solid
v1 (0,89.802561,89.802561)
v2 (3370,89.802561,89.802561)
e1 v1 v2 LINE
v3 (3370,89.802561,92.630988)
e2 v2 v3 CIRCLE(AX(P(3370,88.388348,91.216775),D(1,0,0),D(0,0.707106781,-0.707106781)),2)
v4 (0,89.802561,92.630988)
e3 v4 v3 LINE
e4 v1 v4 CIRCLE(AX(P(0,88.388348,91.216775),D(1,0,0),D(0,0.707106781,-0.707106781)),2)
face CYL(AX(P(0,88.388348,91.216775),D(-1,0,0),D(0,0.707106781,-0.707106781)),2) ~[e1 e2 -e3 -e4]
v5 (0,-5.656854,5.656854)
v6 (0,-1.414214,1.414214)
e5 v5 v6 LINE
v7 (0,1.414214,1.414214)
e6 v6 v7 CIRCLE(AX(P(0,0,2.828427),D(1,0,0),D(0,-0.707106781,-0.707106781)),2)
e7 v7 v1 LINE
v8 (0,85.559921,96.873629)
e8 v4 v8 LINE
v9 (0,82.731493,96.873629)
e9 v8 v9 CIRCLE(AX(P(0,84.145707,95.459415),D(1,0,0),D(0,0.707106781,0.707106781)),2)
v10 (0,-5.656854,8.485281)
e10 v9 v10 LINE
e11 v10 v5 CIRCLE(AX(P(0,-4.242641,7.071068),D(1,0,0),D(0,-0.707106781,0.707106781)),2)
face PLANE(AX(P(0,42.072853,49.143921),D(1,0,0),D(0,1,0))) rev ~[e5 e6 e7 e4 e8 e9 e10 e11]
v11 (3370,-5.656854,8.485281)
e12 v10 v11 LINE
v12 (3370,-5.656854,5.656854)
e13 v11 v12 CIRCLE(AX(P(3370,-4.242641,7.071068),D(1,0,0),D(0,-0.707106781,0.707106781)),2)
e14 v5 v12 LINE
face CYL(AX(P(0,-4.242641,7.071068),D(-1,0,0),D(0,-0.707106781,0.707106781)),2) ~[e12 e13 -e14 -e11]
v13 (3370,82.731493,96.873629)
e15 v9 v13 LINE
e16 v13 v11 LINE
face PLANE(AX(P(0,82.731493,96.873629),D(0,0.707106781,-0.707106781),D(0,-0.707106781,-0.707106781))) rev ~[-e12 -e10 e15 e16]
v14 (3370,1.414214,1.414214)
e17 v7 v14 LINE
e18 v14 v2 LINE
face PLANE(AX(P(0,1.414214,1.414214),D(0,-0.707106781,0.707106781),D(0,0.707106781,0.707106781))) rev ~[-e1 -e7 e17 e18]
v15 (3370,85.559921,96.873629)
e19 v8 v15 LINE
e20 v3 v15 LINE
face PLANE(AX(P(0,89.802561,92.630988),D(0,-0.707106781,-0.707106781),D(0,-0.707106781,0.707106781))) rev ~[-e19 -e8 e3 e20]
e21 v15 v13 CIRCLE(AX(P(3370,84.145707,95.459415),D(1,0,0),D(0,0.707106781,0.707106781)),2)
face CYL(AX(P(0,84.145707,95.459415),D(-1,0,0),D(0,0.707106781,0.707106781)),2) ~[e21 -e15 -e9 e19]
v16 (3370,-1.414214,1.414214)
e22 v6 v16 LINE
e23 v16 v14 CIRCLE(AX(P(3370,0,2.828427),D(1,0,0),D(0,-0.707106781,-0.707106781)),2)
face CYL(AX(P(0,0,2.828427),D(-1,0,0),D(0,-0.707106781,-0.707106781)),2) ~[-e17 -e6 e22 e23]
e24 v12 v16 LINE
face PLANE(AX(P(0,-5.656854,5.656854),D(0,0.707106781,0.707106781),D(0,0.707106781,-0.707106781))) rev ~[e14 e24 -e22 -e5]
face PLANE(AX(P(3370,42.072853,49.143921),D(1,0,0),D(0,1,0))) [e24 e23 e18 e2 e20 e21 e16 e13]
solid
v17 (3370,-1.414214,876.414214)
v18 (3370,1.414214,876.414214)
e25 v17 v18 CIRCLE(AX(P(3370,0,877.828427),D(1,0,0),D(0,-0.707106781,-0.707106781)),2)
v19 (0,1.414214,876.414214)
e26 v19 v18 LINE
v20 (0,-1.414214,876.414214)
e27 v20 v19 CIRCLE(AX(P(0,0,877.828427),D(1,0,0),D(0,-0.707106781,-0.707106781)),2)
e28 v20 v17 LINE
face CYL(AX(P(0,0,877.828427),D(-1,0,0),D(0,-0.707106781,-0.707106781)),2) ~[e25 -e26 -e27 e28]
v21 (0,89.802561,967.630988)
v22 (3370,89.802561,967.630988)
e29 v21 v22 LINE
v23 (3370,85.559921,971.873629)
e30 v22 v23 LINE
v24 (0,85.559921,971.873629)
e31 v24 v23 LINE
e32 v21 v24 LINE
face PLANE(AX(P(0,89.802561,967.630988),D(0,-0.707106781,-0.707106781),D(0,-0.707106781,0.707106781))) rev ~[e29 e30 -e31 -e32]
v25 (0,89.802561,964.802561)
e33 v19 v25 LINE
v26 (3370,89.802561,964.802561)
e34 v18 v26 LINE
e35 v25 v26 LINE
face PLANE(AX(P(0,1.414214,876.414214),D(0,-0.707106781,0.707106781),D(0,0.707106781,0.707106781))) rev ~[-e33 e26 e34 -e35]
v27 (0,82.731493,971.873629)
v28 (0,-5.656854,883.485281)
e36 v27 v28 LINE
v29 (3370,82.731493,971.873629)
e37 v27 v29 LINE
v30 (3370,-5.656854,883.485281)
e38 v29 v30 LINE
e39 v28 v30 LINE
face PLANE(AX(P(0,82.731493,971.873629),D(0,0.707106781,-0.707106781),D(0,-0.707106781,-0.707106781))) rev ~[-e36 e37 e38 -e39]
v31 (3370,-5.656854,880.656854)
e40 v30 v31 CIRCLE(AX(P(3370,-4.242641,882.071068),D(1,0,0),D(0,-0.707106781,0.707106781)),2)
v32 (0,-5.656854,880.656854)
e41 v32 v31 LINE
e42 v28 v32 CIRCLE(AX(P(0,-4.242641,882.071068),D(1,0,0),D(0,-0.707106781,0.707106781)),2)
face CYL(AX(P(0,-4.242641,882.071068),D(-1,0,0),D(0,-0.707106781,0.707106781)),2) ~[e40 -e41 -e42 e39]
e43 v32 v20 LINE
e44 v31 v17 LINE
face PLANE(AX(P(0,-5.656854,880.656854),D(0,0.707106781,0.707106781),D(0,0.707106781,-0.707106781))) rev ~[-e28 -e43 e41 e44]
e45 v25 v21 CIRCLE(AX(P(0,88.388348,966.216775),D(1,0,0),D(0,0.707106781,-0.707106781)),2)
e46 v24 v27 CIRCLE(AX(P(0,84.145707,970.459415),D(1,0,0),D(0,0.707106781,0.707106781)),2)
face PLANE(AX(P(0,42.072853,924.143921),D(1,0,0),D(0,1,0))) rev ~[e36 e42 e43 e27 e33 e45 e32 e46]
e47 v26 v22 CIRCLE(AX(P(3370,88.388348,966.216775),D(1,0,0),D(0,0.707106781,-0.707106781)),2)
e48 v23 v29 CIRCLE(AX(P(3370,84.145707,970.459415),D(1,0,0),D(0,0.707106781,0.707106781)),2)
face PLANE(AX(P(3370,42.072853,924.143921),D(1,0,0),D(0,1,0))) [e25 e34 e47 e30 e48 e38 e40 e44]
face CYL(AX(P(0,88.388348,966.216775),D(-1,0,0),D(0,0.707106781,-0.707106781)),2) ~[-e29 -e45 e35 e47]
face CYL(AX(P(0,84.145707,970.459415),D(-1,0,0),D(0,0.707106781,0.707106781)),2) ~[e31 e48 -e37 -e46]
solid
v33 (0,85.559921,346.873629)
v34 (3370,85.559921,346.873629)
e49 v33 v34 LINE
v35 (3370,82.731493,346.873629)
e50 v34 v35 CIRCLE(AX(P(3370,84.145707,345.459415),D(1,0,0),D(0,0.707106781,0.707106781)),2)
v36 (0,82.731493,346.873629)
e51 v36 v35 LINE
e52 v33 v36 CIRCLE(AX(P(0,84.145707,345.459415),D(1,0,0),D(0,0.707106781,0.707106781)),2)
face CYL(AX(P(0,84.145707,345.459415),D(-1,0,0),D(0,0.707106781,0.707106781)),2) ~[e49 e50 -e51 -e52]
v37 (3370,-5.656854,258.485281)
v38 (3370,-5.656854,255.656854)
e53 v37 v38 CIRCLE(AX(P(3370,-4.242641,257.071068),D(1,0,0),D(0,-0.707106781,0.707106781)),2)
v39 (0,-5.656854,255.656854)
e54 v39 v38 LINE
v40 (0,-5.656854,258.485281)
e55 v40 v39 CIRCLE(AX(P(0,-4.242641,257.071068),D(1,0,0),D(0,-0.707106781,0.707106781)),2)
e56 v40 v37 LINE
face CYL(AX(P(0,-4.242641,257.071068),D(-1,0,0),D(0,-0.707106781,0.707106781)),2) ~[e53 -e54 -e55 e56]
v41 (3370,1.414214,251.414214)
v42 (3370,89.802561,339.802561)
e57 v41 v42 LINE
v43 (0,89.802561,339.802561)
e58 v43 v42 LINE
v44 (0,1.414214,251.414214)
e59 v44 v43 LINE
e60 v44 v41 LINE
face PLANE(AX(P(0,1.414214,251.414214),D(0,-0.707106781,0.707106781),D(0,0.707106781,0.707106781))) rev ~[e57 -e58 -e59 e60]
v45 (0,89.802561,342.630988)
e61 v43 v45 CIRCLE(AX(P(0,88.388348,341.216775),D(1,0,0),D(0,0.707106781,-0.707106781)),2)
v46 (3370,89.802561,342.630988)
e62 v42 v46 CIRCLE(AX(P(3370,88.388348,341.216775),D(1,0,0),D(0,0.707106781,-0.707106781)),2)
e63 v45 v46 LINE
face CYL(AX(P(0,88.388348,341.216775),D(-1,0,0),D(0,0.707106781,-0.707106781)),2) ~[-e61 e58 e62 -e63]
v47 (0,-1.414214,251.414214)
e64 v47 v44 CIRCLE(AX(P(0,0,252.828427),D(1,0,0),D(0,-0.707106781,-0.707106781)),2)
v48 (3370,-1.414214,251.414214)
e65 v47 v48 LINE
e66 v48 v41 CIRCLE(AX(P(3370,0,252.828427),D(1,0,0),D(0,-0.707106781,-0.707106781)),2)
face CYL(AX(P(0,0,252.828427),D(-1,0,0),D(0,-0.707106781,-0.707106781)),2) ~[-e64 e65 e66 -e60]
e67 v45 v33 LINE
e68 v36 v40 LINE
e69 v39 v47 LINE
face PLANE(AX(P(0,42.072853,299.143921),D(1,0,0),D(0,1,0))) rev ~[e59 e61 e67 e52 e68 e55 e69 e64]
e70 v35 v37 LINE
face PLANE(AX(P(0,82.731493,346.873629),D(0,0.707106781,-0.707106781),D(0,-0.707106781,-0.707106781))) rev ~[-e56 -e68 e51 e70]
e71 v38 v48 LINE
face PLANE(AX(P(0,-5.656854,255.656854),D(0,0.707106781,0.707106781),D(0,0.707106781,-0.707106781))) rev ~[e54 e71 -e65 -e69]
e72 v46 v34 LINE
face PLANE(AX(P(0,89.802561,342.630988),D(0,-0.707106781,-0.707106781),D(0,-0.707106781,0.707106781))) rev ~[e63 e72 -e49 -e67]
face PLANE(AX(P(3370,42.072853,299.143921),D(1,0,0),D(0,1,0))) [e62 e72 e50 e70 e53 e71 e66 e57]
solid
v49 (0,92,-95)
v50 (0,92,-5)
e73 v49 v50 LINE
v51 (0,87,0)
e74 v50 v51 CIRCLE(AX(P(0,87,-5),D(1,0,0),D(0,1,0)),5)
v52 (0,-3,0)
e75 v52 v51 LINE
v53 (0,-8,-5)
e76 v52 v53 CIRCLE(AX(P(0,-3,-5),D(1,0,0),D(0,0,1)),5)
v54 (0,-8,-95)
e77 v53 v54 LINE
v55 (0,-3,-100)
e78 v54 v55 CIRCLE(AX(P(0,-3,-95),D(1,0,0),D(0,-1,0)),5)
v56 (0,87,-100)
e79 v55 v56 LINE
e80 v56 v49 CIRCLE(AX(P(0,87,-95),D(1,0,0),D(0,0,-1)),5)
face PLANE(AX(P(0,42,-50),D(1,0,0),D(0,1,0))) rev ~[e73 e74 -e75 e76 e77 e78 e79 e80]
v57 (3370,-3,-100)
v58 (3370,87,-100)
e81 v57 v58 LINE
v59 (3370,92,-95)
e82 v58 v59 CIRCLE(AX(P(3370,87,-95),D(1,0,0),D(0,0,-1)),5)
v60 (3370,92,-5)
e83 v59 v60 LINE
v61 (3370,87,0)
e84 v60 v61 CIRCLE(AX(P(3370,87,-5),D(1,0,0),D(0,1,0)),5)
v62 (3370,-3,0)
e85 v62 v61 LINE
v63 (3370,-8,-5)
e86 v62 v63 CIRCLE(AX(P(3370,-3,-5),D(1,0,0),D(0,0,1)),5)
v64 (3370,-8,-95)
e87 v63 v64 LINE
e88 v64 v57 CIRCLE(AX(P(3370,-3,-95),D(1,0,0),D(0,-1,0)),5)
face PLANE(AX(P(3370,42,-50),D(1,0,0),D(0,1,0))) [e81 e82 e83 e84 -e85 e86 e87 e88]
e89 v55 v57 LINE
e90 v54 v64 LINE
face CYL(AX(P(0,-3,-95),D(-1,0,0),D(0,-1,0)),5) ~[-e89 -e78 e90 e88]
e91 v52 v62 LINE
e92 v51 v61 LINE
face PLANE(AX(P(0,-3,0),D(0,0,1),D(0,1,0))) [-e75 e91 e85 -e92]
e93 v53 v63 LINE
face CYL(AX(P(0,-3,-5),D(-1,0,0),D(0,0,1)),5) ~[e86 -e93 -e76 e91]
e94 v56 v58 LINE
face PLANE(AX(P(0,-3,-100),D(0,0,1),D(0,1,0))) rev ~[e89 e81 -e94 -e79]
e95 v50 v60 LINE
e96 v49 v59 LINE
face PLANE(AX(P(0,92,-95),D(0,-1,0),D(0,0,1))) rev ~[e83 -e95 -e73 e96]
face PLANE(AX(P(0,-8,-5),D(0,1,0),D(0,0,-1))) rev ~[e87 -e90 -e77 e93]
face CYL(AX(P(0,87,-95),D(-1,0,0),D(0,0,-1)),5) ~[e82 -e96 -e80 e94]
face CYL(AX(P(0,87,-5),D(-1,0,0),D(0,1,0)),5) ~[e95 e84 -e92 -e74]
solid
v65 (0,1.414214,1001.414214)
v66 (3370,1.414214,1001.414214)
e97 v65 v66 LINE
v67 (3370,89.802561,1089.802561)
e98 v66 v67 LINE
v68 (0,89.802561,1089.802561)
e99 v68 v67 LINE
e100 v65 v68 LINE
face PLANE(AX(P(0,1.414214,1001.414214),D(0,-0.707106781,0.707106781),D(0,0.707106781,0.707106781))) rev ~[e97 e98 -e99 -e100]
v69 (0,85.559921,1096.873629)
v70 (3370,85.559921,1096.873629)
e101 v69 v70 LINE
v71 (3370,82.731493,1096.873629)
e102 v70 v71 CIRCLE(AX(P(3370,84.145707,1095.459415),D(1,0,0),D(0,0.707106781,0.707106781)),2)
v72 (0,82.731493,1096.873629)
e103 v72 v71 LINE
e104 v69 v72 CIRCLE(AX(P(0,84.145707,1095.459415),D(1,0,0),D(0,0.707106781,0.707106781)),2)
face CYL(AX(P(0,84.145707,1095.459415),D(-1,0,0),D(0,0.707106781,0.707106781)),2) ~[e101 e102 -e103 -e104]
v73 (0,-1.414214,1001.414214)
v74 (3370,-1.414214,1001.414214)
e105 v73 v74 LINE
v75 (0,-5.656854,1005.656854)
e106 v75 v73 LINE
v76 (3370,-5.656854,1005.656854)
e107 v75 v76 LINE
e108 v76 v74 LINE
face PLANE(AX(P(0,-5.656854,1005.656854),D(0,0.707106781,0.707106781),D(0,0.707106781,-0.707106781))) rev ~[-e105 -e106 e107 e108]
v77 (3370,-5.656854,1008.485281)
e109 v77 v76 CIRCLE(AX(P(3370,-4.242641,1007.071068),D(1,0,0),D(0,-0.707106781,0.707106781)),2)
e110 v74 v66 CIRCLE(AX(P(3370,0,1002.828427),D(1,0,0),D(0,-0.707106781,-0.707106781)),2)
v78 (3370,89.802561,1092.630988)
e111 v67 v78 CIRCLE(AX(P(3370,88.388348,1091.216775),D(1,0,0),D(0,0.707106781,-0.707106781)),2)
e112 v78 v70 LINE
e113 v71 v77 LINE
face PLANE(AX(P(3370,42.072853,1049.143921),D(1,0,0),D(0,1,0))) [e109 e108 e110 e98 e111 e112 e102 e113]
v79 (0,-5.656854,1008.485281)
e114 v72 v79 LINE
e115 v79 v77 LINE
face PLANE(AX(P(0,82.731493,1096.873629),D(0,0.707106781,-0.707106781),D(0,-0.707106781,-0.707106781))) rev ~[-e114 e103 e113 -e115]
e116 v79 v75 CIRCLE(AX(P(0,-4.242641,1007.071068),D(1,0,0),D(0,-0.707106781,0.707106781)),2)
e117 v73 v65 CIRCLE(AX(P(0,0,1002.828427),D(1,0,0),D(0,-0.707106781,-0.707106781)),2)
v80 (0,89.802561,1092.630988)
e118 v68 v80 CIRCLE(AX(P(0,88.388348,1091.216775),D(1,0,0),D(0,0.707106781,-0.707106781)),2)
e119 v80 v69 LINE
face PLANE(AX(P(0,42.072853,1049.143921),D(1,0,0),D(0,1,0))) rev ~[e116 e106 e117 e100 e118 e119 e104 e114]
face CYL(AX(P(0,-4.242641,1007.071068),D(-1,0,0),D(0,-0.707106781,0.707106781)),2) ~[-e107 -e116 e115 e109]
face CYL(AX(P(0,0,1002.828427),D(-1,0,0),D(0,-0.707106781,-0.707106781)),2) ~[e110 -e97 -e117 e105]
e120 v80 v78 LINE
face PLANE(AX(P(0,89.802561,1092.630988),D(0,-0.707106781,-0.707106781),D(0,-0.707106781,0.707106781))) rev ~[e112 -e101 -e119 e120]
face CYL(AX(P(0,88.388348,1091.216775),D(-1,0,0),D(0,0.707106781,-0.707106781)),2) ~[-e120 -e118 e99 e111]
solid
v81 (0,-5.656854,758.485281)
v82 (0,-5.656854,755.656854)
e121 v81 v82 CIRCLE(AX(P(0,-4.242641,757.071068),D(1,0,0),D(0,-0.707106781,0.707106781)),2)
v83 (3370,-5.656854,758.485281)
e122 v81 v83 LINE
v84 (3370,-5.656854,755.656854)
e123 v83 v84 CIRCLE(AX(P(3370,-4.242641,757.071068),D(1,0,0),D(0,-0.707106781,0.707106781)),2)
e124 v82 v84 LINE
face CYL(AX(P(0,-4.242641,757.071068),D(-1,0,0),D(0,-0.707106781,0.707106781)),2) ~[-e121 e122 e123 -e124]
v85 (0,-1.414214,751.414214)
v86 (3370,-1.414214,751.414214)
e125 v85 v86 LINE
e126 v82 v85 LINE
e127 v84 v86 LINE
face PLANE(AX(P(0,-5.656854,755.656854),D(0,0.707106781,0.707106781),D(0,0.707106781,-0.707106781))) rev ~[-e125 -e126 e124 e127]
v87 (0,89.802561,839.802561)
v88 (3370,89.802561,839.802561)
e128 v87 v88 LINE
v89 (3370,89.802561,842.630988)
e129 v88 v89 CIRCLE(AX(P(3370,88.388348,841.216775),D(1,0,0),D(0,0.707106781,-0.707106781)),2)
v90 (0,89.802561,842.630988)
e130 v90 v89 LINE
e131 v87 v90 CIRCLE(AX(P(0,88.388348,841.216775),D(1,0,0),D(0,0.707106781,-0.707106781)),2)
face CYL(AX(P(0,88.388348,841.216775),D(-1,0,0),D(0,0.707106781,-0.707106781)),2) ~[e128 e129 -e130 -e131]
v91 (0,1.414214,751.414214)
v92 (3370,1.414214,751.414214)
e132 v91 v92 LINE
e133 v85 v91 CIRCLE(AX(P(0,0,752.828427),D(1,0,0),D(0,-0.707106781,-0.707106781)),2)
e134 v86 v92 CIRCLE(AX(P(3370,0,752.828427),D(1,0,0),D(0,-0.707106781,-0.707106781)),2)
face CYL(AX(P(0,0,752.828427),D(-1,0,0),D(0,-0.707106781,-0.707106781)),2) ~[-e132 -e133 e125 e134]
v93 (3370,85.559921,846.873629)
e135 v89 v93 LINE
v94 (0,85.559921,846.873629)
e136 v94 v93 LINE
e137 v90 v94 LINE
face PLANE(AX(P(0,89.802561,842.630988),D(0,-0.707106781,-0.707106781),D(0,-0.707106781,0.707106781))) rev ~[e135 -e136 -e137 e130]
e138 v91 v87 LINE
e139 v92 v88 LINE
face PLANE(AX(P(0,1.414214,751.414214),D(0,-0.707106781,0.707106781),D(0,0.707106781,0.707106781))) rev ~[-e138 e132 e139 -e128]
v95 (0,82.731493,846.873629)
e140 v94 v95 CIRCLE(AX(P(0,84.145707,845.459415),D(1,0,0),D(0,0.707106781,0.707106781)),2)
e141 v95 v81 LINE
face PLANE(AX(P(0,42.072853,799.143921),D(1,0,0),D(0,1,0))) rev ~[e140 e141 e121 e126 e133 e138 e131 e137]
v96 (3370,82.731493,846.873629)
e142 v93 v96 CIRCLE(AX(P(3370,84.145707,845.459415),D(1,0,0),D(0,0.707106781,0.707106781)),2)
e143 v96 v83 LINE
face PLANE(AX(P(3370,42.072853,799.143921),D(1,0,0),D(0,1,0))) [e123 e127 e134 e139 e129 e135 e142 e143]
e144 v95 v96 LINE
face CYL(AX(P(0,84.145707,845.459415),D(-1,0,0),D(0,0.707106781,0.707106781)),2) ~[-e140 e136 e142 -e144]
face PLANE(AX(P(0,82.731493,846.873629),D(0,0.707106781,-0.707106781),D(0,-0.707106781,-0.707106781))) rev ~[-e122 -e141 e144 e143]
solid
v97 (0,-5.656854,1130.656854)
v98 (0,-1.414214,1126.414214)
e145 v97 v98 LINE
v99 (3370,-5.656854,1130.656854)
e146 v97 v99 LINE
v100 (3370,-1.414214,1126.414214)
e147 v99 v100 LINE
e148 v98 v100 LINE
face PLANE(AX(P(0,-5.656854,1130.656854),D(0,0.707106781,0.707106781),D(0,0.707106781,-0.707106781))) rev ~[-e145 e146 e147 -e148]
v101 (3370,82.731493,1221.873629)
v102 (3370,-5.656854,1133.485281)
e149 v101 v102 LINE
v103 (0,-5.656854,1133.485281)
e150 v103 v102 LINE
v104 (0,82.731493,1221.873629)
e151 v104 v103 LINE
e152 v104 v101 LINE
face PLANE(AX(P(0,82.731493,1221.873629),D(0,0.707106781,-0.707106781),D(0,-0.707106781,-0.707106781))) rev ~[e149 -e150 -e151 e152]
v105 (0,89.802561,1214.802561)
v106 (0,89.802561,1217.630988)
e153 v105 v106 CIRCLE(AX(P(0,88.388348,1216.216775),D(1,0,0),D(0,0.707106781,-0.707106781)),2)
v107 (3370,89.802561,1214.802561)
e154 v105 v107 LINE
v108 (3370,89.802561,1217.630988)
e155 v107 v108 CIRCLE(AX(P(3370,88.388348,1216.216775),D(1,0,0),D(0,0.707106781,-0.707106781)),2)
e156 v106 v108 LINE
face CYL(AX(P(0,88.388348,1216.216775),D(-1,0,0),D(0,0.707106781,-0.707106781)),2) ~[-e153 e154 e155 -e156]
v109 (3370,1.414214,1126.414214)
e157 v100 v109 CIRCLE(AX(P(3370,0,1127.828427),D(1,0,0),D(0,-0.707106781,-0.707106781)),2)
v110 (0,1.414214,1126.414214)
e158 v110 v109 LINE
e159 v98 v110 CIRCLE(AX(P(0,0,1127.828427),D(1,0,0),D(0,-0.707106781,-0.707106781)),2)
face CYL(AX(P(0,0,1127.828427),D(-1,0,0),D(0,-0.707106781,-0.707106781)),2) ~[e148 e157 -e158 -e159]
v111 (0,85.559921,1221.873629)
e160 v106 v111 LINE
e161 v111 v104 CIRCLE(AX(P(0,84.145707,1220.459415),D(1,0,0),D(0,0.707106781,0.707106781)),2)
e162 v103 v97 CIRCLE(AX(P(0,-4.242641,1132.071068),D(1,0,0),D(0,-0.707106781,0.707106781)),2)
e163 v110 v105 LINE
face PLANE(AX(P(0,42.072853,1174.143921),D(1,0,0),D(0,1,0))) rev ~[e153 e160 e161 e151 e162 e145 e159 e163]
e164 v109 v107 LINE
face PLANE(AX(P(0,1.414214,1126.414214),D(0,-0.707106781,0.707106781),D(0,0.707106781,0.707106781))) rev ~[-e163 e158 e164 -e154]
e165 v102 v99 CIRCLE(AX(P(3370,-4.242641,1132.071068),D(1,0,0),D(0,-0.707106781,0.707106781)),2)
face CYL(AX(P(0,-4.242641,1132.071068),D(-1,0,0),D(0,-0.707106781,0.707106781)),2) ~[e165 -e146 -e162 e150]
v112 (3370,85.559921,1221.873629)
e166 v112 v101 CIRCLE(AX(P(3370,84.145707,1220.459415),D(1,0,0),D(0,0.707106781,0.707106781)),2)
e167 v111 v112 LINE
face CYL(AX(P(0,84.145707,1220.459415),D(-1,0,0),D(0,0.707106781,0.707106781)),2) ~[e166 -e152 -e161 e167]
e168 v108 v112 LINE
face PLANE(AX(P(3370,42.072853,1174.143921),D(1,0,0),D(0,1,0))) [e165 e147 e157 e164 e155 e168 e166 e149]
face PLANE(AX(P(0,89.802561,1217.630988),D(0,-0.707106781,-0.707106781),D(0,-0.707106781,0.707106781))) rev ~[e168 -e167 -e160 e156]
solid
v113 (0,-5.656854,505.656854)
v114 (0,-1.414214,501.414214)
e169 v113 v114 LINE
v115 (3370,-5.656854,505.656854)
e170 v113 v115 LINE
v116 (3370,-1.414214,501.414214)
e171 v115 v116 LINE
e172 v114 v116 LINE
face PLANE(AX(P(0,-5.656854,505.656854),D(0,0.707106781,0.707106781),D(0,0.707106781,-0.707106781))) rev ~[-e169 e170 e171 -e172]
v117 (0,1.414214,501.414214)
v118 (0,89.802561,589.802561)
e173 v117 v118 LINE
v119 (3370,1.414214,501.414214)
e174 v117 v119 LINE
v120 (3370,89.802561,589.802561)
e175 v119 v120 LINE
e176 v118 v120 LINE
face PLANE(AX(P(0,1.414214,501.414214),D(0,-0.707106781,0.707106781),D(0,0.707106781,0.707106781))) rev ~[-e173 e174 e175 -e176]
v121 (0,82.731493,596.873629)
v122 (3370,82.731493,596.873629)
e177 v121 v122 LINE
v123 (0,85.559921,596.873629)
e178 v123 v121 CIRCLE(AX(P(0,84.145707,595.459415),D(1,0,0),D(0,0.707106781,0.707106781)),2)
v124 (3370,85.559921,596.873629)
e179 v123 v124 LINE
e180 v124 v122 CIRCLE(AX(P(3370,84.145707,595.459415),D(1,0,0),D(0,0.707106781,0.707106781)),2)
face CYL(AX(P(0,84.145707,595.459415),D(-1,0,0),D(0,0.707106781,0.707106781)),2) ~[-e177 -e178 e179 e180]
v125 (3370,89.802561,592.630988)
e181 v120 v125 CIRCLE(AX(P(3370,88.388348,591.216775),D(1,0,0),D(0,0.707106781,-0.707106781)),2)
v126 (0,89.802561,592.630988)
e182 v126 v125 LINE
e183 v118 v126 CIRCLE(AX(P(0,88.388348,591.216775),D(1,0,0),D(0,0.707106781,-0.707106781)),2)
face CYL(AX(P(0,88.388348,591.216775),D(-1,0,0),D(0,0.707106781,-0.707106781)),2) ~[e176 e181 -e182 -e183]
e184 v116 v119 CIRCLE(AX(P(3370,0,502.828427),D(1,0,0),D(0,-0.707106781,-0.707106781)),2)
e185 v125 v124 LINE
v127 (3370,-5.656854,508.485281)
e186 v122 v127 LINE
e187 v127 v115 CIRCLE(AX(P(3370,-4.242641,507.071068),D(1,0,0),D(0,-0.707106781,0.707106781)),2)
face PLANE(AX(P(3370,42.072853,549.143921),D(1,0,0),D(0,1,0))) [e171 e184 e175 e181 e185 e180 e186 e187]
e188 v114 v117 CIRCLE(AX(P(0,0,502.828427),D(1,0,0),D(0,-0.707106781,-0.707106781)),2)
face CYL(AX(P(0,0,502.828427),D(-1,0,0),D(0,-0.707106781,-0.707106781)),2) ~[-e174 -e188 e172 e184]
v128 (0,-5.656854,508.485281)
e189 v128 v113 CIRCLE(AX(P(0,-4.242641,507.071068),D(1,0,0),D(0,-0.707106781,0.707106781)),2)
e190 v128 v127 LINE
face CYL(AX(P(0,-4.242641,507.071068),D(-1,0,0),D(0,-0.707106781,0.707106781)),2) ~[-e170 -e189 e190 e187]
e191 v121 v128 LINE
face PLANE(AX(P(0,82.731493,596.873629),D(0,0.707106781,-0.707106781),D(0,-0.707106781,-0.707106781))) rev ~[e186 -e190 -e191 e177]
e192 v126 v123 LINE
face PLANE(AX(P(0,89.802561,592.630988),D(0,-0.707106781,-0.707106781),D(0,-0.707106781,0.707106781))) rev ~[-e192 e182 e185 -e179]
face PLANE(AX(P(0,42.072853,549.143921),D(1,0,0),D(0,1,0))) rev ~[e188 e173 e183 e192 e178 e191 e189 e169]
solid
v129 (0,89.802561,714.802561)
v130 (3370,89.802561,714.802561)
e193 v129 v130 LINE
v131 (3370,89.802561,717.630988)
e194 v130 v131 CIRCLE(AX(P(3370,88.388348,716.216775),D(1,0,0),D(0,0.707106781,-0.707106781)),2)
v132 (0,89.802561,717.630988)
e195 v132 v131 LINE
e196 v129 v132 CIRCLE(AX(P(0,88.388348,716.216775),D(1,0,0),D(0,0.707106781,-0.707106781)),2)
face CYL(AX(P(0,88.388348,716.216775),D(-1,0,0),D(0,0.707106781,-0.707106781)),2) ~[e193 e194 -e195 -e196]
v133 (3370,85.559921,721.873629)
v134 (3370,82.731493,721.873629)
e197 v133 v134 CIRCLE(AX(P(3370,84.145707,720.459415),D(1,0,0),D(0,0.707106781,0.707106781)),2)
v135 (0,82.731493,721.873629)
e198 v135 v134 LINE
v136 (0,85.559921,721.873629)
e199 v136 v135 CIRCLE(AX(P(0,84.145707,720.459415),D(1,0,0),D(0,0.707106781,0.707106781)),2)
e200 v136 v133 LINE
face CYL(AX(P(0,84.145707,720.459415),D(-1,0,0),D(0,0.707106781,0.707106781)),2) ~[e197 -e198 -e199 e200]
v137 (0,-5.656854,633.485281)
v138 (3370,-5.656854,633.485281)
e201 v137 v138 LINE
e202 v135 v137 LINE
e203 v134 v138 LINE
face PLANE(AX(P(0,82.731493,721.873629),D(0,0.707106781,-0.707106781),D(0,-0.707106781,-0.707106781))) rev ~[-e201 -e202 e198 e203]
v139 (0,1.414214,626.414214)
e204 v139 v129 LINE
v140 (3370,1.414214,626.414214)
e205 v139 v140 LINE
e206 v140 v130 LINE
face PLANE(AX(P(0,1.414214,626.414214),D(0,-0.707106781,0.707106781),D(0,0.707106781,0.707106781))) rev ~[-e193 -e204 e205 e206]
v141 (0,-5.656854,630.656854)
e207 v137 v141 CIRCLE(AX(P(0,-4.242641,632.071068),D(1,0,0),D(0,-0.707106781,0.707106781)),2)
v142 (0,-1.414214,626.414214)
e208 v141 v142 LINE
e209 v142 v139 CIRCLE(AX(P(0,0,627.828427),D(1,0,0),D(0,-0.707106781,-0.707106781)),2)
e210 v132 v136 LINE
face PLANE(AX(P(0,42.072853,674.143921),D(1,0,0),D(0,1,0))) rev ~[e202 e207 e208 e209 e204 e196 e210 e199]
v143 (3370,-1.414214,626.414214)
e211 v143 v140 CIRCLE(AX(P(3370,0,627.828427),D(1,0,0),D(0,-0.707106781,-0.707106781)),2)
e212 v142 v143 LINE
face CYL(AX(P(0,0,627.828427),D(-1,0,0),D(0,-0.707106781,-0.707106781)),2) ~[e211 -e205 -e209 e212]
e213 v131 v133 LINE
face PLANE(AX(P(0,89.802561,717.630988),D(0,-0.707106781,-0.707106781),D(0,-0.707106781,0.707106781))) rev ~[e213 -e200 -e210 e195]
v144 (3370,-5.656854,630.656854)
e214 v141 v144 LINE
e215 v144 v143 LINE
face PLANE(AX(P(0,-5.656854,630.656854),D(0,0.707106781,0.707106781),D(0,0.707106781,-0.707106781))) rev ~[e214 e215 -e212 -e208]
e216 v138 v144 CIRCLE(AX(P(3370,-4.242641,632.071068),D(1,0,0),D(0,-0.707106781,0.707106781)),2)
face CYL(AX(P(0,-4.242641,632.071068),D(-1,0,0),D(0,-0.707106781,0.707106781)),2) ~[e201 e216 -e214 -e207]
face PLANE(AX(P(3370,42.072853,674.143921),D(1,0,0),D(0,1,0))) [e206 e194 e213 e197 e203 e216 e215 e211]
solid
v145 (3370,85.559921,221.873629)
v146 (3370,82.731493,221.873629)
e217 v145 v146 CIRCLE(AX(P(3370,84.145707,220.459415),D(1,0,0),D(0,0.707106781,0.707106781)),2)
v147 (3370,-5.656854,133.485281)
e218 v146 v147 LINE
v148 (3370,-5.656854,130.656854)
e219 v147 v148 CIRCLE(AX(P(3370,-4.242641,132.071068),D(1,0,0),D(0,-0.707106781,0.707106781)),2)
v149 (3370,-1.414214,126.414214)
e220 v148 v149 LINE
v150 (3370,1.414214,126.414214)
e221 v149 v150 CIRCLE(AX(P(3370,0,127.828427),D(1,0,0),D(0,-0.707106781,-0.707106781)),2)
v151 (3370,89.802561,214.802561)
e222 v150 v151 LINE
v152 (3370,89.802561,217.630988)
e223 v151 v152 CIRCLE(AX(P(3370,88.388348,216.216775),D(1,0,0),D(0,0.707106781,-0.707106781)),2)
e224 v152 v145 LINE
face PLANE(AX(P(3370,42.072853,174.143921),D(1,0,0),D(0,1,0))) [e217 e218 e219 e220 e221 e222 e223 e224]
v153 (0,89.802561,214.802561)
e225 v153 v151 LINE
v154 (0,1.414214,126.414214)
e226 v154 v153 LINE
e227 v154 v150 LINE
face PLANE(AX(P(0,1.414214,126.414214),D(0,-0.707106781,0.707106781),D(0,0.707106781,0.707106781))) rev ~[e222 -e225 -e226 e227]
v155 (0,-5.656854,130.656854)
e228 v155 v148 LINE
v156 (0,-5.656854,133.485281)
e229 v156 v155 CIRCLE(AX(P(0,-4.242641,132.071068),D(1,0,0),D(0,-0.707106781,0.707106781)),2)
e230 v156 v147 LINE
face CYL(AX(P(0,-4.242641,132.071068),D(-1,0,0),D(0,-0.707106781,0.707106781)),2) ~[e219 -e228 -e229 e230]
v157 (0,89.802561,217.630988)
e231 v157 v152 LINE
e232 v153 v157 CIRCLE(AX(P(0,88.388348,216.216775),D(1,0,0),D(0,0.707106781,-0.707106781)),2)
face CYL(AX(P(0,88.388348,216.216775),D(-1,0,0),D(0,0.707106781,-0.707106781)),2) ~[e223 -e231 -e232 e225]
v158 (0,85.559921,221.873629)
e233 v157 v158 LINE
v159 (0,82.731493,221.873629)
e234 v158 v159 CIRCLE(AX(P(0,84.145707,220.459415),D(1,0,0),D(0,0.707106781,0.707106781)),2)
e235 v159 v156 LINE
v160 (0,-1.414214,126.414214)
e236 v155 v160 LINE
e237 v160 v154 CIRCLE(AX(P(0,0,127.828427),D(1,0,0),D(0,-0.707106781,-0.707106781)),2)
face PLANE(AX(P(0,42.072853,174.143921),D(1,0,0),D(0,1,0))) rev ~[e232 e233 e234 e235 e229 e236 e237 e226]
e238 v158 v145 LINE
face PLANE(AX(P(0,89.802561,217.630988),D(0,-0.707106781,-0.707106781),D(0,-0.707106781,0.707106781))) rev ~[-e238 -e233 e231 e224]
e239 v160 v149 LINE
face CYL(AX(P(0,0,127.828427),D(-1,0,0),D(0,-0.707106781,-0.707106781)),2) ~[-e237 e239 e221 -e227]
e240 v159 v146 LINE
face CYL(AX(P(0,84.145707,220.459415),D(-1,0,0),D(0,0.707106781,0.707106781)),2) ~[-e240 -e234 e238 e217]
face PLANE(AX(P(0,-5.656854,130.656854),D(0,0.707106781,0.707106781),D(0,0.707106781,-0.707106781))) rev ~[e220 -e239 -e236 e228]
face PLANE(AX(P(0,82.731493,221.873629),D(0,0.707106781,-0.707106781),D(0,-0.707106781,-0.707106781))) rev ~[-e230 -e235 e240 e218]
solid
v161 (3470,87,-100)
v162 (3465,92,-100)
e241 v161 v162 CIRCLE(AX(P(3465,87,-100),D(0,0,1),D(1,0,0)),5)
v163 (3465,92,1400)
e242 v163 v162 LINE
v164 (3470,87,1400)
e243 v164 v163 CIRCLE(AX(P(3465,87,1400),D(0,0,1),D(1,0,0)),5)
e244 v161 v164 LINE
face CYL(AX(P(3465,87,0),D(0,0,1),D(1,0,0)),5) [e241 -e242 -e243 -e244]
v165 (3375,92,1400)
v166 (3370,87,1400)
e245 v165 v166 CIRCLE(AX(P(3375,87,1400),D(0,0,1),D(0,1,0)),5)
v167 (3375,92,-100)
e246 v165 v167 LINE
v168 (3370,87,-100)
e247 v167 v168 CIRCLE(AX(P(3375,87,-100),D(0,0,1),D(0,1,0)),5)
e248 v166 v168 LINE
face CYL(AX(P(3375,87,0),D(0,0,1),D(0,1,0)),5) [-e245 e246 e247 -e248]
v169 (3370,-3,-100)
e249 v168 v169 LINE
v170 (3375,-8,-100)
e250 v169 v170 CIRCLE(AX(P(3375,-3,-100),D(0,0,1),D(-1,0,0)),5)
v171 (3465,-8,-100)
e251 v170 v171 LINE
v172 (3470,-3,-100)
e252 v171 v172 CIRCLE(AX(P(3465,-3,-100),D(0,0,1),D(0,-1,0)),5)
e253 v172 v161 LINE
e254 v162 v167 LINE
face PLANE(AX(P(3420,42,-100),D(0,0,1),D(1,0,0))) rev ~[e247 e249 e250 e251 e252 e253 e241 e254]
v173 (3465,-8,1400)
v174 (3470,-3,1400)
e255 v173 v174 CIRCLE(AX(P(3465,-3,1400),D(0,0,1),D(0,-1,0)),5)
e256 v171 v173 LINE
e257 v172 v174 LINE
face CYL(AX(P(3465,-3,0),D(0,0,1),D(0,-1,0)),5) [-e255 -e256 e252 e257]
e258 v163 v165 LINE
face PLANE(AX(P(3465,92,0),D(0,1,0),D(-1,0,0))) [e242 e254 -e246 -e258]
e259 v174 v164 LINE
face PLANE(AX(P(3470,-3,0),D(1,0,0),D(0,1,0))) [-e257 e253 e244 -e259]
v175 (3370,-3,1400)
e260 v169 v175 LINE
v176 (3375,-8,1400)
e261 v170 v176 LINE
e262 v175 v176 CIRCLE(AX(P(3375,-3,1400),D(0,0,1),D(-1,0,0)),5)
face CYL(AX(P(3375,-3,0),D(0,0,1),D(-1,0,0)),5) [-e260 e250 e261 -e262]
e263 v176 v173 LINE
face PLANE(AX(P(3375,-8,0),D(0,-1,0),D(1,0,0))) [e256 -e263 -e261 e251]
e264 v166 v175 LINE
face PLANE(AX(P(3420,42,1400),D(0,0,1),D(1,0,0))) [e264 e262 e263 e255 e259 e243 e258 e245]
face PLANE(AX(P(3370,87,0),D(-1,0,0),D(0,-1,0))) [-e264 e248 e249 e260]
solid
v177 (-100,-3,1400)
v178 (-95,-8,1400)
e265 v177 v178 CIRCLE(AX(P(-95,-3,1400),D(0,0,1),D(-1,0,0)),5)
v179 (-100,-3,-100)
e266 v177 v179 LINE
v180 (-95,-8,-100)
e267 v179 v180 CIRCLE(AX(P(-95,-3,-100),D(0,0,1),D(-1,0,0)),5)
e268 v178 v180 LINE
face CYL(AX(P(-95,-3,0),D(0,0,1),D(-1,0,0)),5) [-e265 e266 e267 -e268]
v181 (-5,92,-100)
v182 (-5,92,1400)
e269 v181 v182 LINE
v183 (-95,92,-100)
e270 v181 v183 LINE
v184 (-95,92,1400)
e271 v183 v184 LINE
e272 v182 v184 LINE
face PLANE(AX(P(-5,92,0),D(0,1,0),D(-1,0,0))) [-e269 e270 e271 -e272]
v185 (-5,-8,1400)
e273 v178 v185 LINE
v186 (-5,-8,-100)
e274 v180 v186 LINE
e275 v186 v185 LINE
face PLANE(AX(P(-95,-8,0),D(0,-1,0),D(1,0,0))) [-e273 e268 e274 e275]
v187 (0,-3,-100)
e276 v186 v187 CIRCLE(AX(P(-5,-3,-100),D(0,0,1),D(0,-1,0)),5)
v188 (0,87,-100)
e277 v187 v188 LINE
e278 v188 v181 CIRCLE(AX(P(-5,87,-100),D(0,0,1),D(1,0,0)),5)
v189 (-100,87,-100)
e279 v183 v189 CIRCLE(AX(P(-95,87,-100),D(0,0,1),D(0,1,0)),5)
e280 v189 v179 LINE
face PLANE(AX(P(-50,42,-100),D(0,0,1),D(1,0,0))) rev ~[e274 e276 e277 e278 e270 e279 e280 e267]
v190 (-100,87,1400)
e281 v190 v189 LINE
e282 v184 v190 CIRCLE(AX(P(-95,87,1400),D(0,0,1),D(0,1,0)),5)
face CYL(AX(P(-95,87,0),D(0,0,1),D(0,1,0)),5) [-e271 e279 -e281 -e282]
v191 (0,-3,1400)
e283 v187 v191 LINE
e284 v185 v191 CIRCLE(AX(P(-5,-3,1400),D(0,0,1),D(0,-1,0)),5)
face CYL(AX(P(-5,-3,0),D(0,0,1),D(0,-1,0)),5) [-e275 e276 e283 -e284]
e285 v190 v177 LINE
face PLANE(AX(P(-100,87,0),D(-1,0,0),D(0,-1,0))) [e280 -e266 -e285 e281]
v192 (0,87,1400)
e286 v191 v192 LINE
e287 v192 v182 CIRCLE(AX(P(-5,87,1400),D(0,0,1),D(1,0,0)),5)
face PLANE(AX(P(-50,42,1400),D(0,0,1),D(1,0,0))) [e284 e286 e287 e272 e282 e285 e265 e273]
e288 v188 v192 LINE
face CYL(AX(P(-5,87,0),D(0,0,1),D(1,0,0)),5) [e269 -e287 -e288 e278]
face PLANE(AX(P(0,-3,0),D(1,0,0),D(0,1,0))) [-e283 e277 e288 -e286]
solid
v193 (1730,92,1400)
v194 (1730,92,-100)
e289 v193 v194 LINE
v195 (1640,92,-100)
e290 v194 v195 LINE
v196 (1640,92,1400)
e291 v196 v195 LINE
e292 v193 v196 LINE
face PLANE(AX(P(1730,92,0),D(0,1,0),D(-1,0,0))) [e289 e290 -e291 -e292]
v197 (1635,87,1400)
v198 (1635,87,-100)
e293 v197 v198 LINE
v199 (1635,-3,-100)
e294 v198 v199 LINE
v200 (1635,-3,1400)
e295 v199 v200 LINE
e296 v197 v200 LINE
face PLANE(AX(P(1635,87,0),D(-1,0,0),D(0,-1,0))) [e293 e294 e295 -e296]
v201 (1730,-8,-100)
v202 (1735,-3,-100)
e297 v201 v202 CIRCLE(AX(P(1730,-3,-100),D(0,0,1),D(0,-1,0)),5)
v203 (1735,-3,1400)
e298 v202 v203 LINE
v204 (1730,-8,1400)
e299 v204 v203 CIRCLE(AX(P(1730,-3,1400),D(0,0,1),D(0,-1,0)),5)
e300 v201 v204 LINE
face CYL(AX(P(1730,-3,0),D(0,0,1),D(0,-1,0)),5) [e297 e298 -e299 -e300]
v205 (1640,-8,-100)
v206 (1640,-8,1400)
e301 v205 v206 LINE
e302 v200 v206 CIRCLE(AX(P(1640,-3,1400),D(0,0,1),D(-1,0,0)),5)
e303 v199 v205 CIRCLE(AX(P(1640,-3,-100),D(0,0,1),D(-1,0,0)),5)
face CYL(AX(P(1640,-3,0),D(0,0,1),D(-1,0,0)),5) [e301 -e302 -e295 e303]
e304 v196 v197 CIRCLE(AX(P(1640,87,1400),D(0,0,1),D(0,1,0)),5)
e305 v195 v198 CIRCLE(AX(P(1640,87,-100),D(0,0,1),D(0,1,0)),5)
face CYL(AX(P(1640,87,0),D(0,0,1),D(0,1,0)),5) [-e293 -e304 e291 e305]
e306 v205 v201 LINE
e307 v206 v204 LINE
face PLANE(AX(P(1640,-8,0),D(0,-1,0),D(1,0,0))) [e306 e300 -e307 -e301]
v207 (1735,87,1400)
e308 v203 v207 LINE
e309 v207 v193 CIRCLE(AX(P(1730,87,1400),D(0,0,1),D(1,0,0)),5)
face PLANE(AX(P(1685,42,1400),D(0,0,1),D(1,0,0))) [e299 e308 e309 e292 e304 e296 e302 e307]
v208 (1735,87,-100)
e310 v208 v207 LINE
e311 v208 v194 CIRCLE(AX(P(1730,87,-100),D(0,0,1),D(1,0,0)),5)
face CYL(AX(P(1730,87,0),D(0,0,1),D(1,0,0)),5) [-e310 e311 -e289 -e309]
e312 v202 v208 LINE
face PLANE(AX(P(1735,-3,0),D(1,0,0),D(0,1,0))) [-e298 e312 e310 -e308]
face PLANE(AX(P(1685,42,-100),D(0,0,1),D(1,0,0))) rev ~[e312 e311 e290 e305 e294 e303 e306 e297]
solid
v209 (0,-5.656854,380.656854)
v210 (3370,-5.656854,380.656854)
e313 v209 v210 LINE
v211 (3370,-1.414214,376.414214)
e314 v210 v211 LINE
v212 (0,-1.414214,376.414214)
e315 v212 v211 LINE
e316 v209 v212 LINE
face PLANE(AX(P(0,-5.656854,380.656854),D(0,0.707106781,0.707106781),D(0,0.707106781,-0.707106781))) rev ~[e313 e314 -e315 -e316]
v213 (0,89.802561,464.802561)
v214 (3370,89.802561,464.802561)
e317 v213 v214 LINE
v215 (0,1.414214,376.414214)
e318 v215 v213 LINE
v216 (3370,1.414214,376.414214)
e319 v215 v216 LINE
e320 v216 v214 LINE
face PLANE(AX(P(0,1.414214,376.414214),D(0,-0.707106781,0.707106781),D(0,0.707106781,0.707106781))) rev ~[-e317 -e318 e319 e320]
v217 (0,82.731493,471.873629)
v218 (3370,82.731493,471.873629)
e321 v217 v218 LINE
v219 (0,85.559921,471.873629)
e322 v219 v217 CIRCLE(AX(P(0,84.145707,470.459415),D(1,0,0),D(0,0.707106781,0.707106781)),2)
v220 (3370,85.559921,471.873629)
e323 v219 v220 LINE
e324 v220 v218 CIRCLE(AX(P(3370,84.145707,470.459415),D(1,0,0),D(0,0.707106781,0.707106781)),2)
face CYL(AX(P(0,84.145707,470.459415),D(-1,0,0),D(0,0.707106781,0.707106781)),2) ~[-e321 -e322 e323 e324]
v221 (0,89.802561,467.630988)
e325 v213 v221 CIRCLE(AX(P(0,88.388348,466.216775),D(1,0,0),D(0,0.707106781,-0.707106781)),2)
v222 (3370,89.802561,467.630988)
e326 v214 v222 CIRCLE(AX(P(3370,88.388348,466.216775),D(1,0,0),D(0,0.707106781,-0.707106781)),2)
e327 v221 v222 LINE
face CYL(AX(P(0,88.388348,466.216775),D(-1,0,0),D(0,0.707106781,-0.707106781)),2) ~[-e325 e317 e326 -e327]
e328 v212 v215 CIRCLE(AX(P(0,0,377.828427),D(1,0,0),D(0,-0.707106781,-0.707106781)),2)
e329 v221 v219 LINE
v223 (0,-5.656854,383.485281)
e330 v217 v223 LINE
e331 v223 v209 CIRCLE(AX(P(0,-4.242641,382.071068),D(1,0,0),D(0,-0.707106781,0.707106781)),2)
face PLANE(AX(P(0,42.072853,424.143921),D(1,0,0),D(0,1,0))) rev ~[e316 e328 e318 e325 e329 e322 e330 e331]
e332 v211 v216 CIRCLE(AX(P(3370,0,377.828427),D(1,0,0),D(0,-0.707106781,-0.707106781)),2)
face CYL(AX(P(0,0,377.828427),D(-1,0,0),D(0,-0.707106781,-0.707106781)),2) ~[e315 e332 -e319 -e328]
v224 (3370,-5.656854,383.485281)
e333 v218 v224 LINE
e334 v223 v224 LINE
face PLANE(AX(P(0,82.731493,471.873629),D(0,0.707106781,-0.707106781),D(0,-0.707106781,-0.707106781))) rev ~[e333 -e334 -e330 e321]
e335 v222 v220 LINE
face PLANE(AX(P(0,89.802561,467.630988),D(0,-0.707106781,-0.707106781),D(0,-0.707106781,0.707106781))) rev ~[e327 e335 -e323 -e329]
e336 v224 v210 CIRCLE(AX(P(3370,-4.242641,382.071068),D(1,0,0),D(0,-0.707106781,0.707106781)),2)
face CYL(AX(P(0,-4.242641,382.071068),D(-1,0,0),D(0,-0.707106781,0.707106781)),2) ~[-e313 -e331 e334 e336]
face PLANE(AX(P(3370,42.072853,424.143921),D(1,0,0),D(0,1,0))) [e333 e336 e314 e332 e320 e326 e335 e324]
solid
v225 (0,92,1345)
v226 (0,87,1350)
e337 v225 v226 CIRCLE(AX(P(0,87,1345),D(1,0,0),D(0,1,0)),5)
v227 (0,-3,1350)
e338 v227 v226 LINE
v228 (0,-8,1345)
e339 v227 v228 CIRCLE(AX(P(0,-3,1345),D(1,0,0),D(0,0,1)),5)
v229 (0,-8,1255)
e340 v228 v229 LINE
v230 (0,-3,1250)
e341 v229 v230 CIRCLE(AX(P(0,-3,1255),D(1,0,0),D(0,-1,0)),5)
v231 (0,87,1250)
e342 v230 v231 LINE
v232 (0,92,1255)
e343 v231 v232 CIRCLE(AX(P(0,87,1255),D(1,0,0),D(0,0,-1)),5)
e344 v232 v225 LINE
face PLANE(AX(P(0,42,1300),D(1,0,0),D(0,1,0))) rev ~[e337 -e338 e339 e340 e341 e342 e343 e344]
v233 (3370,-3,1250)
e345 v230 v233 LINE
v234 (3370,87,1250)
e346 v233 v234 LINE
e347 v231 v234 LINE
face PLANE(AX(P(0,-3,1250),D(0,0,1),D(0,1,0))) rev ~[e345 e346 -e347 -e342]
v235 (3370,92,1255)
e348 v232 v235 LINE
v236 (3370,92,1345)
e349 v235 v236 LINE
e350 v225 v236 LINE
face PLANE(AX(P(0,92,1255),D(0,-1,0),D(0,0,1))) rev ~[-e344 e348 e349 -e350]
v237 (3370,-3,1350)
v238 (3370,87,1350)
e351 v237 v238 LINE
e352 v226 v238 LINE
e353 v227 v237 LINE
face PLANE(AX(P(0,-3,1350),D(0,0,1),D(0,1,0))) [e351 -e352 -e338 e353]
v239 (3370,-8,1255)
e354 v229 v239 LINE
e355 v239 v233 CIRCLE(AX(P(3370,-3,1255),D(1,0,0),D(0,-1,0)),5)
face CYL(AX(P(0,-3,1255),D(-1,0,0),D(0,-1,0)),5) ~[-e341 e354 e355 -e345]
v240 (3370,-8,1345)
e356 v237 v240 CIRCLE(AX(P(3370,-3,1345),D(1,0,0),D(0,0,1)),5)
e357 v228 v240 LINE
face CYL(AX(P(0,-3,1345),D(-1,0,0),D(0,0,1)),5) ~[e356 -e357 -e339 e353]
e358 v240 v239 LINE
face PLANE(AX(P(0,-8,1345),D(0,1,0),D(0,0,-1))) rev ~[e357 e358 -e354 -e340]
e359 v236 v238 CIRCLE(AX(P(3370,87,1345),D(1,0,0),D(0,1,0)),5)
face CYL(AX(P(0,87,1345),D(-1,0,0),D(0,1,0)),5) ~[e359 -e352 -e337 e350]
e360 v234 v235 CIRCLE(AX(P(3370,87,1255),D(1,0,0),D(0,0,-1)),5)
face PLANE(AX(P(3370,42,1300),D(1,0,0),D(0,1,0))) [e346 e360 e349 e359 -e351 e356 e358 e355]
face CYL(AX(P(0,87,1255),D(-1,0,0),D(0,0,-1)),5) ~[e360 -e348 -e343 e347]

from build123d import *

# Parameters (mm, degrees)
F1_DEPTH      = 3370
F3_DEPTH      = 1400
F3_DEPTH_BACK = 100
F4_W          = 90
F4_H          = 100
F5_DEPTH      = 3370


# Not quite as in the source:
# - a feature names something its author has since deleted; it is built from what else it names


with BuildPart() as f1:
    # F0 (on Right) → F1 (new body)
    with BuildSketch(Plane.YZ):
        with BuildLine():
            ThreePointArc((-1.4142135624, 1.4142135624), (0, 0.8284271247), (1.4142135624, 1.4142135624))
            Line((1.4142135624, 1.4142135624), (89.8025612107, 89.8025612107))
            ThreePointArc((89.8025612107, 89.8025612107), (90.3883476483, 91.2167747731), (89.8025612107, 92.6309883354))
            Line((89.8025612107, 92.6309883354), (85.5599205236, 96.8736290226))
            ThreePointArc((85.5599205236, 96.8736290226), (84.1457069612, 97.4594154602), (82.7314933988, 96.8736290226))
            Line((82.7314933988, 96.8736290226), (-5.6568542495, 8.4852813742))
            ThreePointArc((-5.6568542495, 8.4852813742), (-6.2426406871, 7.0710678119), (-5.6568542495, 5.6568542495))
            Line((-5.6568542495, 5.6568542495), (-1.4142135624, 1.4142135624))
        make_face()
    extrude(amount=F1_DEPTH)


with BuildPart() as f1b:
    # F0 (on Right) → F1, piece 2 (new body)
    with BuildSketch(Plane.YZ):
        with BuildLine():
            ThreePointArc((-1.4142135624, 126.4142135624), (0, 125.8284271247), (1.4142135624, 126.4142135624))
            Line((1.4142135624, 126.4142135624), (89.8025612107, 214.8025612107))
            ThreePointArc((89.8025612107, 214.8025612107), (90.3883476483, 216.2167747731), (89.8025612107, 217.6309883354))
            Line((89.8025612107, 217.6309883354), (85.5599205236, 221.8736290226))
            ThreePointArc((85.5599205236, 221.8736290226), (84.1457069612, 222.4594154602), (82.7314933988, 221.8736290226))
            Line((82.7314933988, 221.8736290226), (-5.6568542495, 133.4852813742))
            ThreePointArc((-5.6568542495, 133.4852813742), (-6.2426406871, 132.0710678119), (-5.6568542495, 130.6568542495))
            Line((-5.6568542495, 130.6568542495), (-1.4142135624, 126.4142135624))
        make_face()
    extrude(amount=F1_DEPTH)


with BuildPart() as f1c:
    # F0 (on Right) → F1, piece 3 (new body)
    with BuildSketch(Plane.YZ):
        with BuildLine():
            ThreePointArc((-1.4142135624, 251.4142135624), (0, 250.8284271247), (1.4142135624, 251.4142135624))
            Line((1.4142135624, 251.4142135624), (89.8025612107, 339.8025612107))
            ThreePointArc((89.8025612107, 339.8025612107), (90.3883476483, 341.2167747731), (89.8025612107, 342.6309883354))
            Line((89.8025612107, 342.6309883354), (85.5599205236, 346.8736290226))
            ThreePointArc((85.5599205236, 346.8736290226), (84.1457069612, 347.4594154602), (82.7314933988, 346.8736290226))
            Line((82.7314933988, 346.8736290226), (-5.6568542495, 258.4852813742))
            ThreePointArc((-5.6568542495, 258.4852813742), (-6.2426406871, 257.0710678119), (-5.6568542495, 255.6568542495))
            Line((-5.6568542495, 255.6568542495), (-1.4142135624, 251.4142135624))
        make_face()
    extrude(amount=F1_DEPTH)


with BuildPart() as f1d:
    # F0 (on Right) → F1, piece 4 (new body)
    with BuildSketch(Plane.YZ):
        with BuildLine():
            ThreePointArc((-1.4142135624, 376.4142135624), (0, 375.8284271247), (1.4142135624, 376.4142135624))
            Line((1.4142135624, 376.4142135624), (89.8025612107, 464.8025612107))
            ThreePointArc((89.8025612107, 464.8025612107), (90.3883476483, 466.2167747731), (89.8025612107, 467.6309883354))
            Line((89.8025612107, 467.6309883354), (85.5599205236, 471.8736290226))
            ThreePointArc((85.5599205236, 471.8736290226), (84.1457069612, 472.4594154602), (82.7314933988, 471.8736290226))
            Line((82.7314933988, 471.8736290226), (-5.6568542495, 383.4852813742))
            ThreePointArc((-5.6568542495, 383.4852813742), (-6.2426406871, 382.0710678119), (-5.6568542495, 380.6568542495))
            Line((-5.6568542495, 380.6568542495), (-1.4142135624, 376.4142135624))
        make_face()
    extrude(amount=F1_DEPTH)


with BuildPart() as f1e:
    # F0 (on Right) → F1, piece 5 (new body)
    with BuildSketch(Plane.YZ):
        with BuildLine():
            ThreePointArc((-1.4142135624, 501.4142135624), (0, 500.8284271247), (1.4142135624, 501.4142135624))
            Line((1.4142135624, 501.4142135624), (89.8025612107, 589.8025612107))
            ThreePointArc((89.8025612107, 589.8025612107), (90.3883476483, 591.2167747731), (89.8025612107, 592.6309883354))
            Line((89.8025612107, 592.6309883354), (85.5599205236, 596.8736290226))
            ThreePointArc((85.5599205236, 596.8736290226), (84.1457069612, 597.4594154602), (82.7314933988, 596.8736290226))
            Line((82.7314933988, 596.8736290226), (-5.6568542495, 508.4852813742))
            ThreePointArc((-5.6568542495, 508.4852813742), (-6.2426406871, 507.0710678119), (-5.6568542495, 505.6568542495))
            Line((-5.6568542495, 505.6568542495), (-1.4142135624, 501.4142135624))
        make_face()
    extrude(amount=F1_DEPTH)


with BuildPart() as f1f:
    # F0 (on Right) → F1, piece 6 (new body)
    with BuildSketch(Plane.YZ):
        with BuildLine():
            ThreePointArc((-1.4142135624, 626.4142135624), (0, 625.8284271247), (1.4142135624, 626.4142135624))
            Line((1.4142135624, 626.4142135624), (89.8025612107, 714.8025612107))
            ThreePointArc((89.8025612107, 714.8025612107), (90.3883476483, 716.2167747731), (89.8025612107, 717.6309883354))
            Line((89.8025612107, 717.6309883354), (85.5599205236, 721.8736290226))
            ThreePointArc((85.5599205236, 721.8736290226), (84.1457069612, 722.4594154602), (82.7314933988, 721.8736290226))
            Line((82.7314933988, 721.8736290226), (-5.6568542495, 633.4852813742))
            ThreePointArc((-5.6568542495, 633.4852813742), (-6.2426406871, 632.0710678119), (-5.6568542495, 630.6568542495))
            Line((-5.6568542495, 630.6568542495), (-1.4142135624, 626.4142135624))
        make_face()
    extrude(amount=F1_DEPTH)


with BuildPart() as f1g:
    # F0 (on Right) → F1, piece 7 (new body)
    with BuildSketch(Plane.YZ):
        with BuildLine():
            ThreePointArc((-1.4142135624, 751.4142135624), (0, 750.8284271247), (1.4142135624, 751.4142135624))
            Line((1.4142135624, 751.4142135624), (89.8025612107, 839.8025612107))
            ThreePointArc((89.8025612107, 839.8025612107), (90.3883476483, 841.2167747731), (89.8025612107, 842.6309883354))
            Line((89.8025612107, 842.6309883354), (85.5599205236, 846.8736290226))
            ThreePointArc((85.5599205236, 846.8736290226), (84.1457069612, 847.4594154602), (82.7314933988, 846.8736290226))
            Line((82.7314933988, 846.8736290226), (-5.6568542495, 758.4852813742))
            ThreePointArc((-5.6568542495, 758.4852813742), (-6.2426406871, 757.0710678119), (-5.6568542495, 755.6568542495))
            Line((-5.6568542495, 755.6568542495), (-1.4142135624, 751.4142135624))
        make_face()
    extrude(amount=F1_DEPTH)


with BuildPart() as f1h:
    # F0 (on Right) → F1, piece 8 (new body)
    with BuildSketch(Plane.YZ):
        with BuildLine():
            ThreePointArc((-1.4142135624, 876.4142135624), (0, 875.8284271247), (1.4142135624, 876.4142135624))
            Line((1.4142135624, 876.4142135624), (89.8025612107, 964.8025612107))
            ThreePointArc((89.8025612107, 964.8025612107), (90.3883476483, 966.2167747731), (89.8025612107, 967.6309883354))
            Line((89.8025612107, 967.6309883354), (85.5599205236, 971.8736290226))
            ThreePointArc((85.5599205236, 971.8736290226), (84.1457069612, 972.4594154602), (82.7314933988, 971.8736290226))
            Line((82.7314933988, 971.8736290226), (-5.6568542495, 883.4852813742))
            ThreePointArc((-5.6568542495, 883.4852813742), (-6.2426406871, 882.0710678119), (-5.6568542495, 880.6568542495))
            Line((-5.6568542495, 880.6568542495), (-1.4142135624, 876.4142135624))
        make_face()
    extrude(amount=F1_DEPTH)


with BuildPart() as f1i:
    # F0 (on Right) → F1, piece 9 (new body)
    with BuildSketch(Plane.YZ):
        with BuildLine():
            ThreePointArc((-1.4142135624, 1001.4142135624), (0, 1000.8284271247), (1.4142135624, 1001.4142135624))
            Line((1.4142135624, 1001.4142135624), (89.8025612107, 1089.8025612107))
            ThreePointArc((89.8025612107, 1089.8025612107), (90.3883476483, 1091.2167747731), (89.8025612107, 1092.6309883354))
            Line((89.8025612107, 1092.6309883354), (85.5599205236, 1096.8736290226))
            ThreePointArc((85.5599205236, 1096.8736290226), (84.1457069612, 1097.4594154602), (82.7314933988, 1096.8736290226))
            Line((82.7314933988, 1096.8736290226), (-5.6568542495, 1008.4852813742))
            ThreePointArc((-5.6568542495, 1008.4852813742), (-6.2426406871, 1007.0710678119), (-5.6568542495, 1005.6568542495))
            Line((-5.6568542495, 1005.6568542495), (-1.4142135624, 1001.4142135624))
        make_face()
    extrude(amount=F1_DEPTH)


with BuildPart() as f1j:
    # F0 (on Right) → F1, piece 10 (new body)
    with BuildSketch(Plane.YZ):
        with BuildLine():
            ThreePointArc((-1.4142135624, 1126.4142135624), (0, 1125.8284271247), (1.4142135624, 1126.4142135624))
            Line((1.4142135624, 1126.4142135624), (89.8025612107, 1214.8025612107))
            ThreePointArc((89.8025612107, 1214.8025612107), (90.3883476483, 1216.2167747731), (89.8025612107, 1217.6309883354))
            Line((89.8025612107, 1217.6309883354), (85.5599205236, 1221.8736290226))
            ThreePointArc((85.5599205236, 1221.8736290226), (84.1457069612, 1222.4594154602), (82.7314933988, 1221.8736290226))
            Line((82.7314933988, 1221.8736290226), (-5.6568542495, 1133.4852813742))
            ThreePointArc((-5.6568542495, 1133.4852813742), (-6.2426406871, 1132.0710678119), (-5.6568542495, 1130.6568542495))
            Line((-5.6568542495, 1130.6568542495), (-1.4142135624, 1126.4142135624))
        make_face()
    extrude(amount=F1_DEPTH)


with BuildPart() as f3:
    # F2 (on Top) → F3 (new body, two sides)
    with BuildSketch(Plane.XY) as f3_sk:
        with BuildLine():
            Line((-95, -8), (-5, -8))
            ThreePointArc((-5, -8), (-1.4644660941, -6.5355339059), (0, -3))
            Line((0, -3), (0, 87))
            ThreePointArc((0, 87), (-1.4644660941, 90.5355339059), (-5, 92))
            Line((-5, 92), (-95, 92))
            ThreePointArc((-95, 92), (-98.5355339059, 90.5355339059), (-100, 87))
            Line((-100, 87), (-100, -3))
            ThreePointArc((-100, -3), (-98.5355339059, -6.5355339059), (-95, -8))
        make_face()
    extrude(amount=F3_DEPTH)
    extrude(f3_sk.sketch, amount=-F3_DEPTH_BACK)


with BuildPart() as f3b:
    # F2 (on Top) → F3, piece 2 (new body, two sides)
    with BuildSketch(Plane.XY) as f3_2_sk:
        with BuildLine():
            Line((1635, 87), (1635, -3))
            ThreePointArc((1635, -3), (1636.4644660941, -6.5355339059), (1640, -8))
            Line((1640, -8), (1730, -8))
            ThreePointArc((1730, -8), (1733.5355339059, -6.5355339059), (1735, -3))
            Line((1735, -3), (1735, 87))
            ThreePointArc((1735, 87), (1733.5355339059, 90.5355339059), (1730, 92))
            Line((1730, 92), (1640, 92))
            ThreePointArc((1640, 92), (1636.4644660941, 90.5355339059), (1635, 87))
        make_face()
    extrude(amount=F3_DEPTH)
    extrude(f3_2_sk.sketch, amount=-F3_DEPTH_BACK)


with BuildPart() as f3c:
    # F2 (on Top) → F3, piece 3 (new body, two sides)
    with BuildSketch(Plane.XY) as f3_3_sk:
        with BuildLine():
            Line((3370, 87), (3370, -3))
            ThreePointArc((3370, -3), (3371.4644660941, -6.5355339059), (3375, -8))
            Line((3375, -8), (3465, -8))
            ThreePointArc((3465, -8), (3468.5355339059, -6.5355339059), (3470, -3))
            Line((3470, -3), (3470, 87))
            ThreePointArc((3470, 87), (3468.5355339059, 90.5355339059), (3465, 92))
            Line((3465, 92), (3375, 92))
            ThreePointArc((3375, 92), (3371.4644660941, 90.5355339059), (3370, 87))
        make_face()
    extrude(amount=F3_DEPTH)
    extrude(f3_3_sk.sketch, amount=-F3_DEPTH_BACK)


with BuildPart() as f5:
    # F4 (on face) → F5 (new body)
    with BuildSketch(Plane.YZ):
        with Locations((42, 1300)):
            Rectangle(F4_W, F4_H)
        with BuildLine():
            Line((87, 1350), (87, 1250))
            ThreePointArc((87, 1250), (90.5355339059, 1251.4644660941), (92, 1255))
            Line((92, 1255), (92, 1345))
            ThreePointArc((92, 1345), (90.5355339059, 1348.5355339059), (87, 1350))
        make_face()
        with BuildLine():
            ThreePointArc((-8, 1255), (-6.5355339059, 1251.4644660941), (-3, 1250))
            Line((-3, 1250), (-3, 1350))
            ThreePointArc((-3, 1350), (-6.5355339059, 1348.5355339059), (-8, 1345))
            Line((-8, 1345), (-8, 1255))
        make_face()
    extrude(amount=F5_DEPTH)


with BuildPart() as f5b:
    # F4 (on face) → F5, piece 2 (new body)
    with BuildSketch(Plane.YZ):
        with Locations((42, -50)):
            Rectangle(F4_W, F4_H)
        with BuildLine():
            Line((87, 0), (87, -100))
            ThreePointArc((87, -100), (90.5355339059, -98.5355339059), (92, -95))
            Line((92, -95), (92, -5))
            ThreePointArc((92, -5), (90.5355339059, -1.4644660941), (87, 0))
        make_face()
        with BuildLine():
            ThreePointArc((-8, -95), (-6.5355339059, -98.5355339059), (-3, -100))
            Line((-3, -100), (-3, 0))
            ThreePointArc((-3, 0), (-6.5355339059, -1.4644660941), (-8, -5))
            Line((-8, -5), (-8, -95))
        make_face()
    extrude(amount=F5_DEPTH)


solid = Compound([f1.part, f1b.part, f1c.part, f1d.part, f1e.part, f1f.part, f1g.part, f1h.part, f1i.part, f1j.part, f3.part, f3b.part, f3c.part, f5.part, f5b.part])
